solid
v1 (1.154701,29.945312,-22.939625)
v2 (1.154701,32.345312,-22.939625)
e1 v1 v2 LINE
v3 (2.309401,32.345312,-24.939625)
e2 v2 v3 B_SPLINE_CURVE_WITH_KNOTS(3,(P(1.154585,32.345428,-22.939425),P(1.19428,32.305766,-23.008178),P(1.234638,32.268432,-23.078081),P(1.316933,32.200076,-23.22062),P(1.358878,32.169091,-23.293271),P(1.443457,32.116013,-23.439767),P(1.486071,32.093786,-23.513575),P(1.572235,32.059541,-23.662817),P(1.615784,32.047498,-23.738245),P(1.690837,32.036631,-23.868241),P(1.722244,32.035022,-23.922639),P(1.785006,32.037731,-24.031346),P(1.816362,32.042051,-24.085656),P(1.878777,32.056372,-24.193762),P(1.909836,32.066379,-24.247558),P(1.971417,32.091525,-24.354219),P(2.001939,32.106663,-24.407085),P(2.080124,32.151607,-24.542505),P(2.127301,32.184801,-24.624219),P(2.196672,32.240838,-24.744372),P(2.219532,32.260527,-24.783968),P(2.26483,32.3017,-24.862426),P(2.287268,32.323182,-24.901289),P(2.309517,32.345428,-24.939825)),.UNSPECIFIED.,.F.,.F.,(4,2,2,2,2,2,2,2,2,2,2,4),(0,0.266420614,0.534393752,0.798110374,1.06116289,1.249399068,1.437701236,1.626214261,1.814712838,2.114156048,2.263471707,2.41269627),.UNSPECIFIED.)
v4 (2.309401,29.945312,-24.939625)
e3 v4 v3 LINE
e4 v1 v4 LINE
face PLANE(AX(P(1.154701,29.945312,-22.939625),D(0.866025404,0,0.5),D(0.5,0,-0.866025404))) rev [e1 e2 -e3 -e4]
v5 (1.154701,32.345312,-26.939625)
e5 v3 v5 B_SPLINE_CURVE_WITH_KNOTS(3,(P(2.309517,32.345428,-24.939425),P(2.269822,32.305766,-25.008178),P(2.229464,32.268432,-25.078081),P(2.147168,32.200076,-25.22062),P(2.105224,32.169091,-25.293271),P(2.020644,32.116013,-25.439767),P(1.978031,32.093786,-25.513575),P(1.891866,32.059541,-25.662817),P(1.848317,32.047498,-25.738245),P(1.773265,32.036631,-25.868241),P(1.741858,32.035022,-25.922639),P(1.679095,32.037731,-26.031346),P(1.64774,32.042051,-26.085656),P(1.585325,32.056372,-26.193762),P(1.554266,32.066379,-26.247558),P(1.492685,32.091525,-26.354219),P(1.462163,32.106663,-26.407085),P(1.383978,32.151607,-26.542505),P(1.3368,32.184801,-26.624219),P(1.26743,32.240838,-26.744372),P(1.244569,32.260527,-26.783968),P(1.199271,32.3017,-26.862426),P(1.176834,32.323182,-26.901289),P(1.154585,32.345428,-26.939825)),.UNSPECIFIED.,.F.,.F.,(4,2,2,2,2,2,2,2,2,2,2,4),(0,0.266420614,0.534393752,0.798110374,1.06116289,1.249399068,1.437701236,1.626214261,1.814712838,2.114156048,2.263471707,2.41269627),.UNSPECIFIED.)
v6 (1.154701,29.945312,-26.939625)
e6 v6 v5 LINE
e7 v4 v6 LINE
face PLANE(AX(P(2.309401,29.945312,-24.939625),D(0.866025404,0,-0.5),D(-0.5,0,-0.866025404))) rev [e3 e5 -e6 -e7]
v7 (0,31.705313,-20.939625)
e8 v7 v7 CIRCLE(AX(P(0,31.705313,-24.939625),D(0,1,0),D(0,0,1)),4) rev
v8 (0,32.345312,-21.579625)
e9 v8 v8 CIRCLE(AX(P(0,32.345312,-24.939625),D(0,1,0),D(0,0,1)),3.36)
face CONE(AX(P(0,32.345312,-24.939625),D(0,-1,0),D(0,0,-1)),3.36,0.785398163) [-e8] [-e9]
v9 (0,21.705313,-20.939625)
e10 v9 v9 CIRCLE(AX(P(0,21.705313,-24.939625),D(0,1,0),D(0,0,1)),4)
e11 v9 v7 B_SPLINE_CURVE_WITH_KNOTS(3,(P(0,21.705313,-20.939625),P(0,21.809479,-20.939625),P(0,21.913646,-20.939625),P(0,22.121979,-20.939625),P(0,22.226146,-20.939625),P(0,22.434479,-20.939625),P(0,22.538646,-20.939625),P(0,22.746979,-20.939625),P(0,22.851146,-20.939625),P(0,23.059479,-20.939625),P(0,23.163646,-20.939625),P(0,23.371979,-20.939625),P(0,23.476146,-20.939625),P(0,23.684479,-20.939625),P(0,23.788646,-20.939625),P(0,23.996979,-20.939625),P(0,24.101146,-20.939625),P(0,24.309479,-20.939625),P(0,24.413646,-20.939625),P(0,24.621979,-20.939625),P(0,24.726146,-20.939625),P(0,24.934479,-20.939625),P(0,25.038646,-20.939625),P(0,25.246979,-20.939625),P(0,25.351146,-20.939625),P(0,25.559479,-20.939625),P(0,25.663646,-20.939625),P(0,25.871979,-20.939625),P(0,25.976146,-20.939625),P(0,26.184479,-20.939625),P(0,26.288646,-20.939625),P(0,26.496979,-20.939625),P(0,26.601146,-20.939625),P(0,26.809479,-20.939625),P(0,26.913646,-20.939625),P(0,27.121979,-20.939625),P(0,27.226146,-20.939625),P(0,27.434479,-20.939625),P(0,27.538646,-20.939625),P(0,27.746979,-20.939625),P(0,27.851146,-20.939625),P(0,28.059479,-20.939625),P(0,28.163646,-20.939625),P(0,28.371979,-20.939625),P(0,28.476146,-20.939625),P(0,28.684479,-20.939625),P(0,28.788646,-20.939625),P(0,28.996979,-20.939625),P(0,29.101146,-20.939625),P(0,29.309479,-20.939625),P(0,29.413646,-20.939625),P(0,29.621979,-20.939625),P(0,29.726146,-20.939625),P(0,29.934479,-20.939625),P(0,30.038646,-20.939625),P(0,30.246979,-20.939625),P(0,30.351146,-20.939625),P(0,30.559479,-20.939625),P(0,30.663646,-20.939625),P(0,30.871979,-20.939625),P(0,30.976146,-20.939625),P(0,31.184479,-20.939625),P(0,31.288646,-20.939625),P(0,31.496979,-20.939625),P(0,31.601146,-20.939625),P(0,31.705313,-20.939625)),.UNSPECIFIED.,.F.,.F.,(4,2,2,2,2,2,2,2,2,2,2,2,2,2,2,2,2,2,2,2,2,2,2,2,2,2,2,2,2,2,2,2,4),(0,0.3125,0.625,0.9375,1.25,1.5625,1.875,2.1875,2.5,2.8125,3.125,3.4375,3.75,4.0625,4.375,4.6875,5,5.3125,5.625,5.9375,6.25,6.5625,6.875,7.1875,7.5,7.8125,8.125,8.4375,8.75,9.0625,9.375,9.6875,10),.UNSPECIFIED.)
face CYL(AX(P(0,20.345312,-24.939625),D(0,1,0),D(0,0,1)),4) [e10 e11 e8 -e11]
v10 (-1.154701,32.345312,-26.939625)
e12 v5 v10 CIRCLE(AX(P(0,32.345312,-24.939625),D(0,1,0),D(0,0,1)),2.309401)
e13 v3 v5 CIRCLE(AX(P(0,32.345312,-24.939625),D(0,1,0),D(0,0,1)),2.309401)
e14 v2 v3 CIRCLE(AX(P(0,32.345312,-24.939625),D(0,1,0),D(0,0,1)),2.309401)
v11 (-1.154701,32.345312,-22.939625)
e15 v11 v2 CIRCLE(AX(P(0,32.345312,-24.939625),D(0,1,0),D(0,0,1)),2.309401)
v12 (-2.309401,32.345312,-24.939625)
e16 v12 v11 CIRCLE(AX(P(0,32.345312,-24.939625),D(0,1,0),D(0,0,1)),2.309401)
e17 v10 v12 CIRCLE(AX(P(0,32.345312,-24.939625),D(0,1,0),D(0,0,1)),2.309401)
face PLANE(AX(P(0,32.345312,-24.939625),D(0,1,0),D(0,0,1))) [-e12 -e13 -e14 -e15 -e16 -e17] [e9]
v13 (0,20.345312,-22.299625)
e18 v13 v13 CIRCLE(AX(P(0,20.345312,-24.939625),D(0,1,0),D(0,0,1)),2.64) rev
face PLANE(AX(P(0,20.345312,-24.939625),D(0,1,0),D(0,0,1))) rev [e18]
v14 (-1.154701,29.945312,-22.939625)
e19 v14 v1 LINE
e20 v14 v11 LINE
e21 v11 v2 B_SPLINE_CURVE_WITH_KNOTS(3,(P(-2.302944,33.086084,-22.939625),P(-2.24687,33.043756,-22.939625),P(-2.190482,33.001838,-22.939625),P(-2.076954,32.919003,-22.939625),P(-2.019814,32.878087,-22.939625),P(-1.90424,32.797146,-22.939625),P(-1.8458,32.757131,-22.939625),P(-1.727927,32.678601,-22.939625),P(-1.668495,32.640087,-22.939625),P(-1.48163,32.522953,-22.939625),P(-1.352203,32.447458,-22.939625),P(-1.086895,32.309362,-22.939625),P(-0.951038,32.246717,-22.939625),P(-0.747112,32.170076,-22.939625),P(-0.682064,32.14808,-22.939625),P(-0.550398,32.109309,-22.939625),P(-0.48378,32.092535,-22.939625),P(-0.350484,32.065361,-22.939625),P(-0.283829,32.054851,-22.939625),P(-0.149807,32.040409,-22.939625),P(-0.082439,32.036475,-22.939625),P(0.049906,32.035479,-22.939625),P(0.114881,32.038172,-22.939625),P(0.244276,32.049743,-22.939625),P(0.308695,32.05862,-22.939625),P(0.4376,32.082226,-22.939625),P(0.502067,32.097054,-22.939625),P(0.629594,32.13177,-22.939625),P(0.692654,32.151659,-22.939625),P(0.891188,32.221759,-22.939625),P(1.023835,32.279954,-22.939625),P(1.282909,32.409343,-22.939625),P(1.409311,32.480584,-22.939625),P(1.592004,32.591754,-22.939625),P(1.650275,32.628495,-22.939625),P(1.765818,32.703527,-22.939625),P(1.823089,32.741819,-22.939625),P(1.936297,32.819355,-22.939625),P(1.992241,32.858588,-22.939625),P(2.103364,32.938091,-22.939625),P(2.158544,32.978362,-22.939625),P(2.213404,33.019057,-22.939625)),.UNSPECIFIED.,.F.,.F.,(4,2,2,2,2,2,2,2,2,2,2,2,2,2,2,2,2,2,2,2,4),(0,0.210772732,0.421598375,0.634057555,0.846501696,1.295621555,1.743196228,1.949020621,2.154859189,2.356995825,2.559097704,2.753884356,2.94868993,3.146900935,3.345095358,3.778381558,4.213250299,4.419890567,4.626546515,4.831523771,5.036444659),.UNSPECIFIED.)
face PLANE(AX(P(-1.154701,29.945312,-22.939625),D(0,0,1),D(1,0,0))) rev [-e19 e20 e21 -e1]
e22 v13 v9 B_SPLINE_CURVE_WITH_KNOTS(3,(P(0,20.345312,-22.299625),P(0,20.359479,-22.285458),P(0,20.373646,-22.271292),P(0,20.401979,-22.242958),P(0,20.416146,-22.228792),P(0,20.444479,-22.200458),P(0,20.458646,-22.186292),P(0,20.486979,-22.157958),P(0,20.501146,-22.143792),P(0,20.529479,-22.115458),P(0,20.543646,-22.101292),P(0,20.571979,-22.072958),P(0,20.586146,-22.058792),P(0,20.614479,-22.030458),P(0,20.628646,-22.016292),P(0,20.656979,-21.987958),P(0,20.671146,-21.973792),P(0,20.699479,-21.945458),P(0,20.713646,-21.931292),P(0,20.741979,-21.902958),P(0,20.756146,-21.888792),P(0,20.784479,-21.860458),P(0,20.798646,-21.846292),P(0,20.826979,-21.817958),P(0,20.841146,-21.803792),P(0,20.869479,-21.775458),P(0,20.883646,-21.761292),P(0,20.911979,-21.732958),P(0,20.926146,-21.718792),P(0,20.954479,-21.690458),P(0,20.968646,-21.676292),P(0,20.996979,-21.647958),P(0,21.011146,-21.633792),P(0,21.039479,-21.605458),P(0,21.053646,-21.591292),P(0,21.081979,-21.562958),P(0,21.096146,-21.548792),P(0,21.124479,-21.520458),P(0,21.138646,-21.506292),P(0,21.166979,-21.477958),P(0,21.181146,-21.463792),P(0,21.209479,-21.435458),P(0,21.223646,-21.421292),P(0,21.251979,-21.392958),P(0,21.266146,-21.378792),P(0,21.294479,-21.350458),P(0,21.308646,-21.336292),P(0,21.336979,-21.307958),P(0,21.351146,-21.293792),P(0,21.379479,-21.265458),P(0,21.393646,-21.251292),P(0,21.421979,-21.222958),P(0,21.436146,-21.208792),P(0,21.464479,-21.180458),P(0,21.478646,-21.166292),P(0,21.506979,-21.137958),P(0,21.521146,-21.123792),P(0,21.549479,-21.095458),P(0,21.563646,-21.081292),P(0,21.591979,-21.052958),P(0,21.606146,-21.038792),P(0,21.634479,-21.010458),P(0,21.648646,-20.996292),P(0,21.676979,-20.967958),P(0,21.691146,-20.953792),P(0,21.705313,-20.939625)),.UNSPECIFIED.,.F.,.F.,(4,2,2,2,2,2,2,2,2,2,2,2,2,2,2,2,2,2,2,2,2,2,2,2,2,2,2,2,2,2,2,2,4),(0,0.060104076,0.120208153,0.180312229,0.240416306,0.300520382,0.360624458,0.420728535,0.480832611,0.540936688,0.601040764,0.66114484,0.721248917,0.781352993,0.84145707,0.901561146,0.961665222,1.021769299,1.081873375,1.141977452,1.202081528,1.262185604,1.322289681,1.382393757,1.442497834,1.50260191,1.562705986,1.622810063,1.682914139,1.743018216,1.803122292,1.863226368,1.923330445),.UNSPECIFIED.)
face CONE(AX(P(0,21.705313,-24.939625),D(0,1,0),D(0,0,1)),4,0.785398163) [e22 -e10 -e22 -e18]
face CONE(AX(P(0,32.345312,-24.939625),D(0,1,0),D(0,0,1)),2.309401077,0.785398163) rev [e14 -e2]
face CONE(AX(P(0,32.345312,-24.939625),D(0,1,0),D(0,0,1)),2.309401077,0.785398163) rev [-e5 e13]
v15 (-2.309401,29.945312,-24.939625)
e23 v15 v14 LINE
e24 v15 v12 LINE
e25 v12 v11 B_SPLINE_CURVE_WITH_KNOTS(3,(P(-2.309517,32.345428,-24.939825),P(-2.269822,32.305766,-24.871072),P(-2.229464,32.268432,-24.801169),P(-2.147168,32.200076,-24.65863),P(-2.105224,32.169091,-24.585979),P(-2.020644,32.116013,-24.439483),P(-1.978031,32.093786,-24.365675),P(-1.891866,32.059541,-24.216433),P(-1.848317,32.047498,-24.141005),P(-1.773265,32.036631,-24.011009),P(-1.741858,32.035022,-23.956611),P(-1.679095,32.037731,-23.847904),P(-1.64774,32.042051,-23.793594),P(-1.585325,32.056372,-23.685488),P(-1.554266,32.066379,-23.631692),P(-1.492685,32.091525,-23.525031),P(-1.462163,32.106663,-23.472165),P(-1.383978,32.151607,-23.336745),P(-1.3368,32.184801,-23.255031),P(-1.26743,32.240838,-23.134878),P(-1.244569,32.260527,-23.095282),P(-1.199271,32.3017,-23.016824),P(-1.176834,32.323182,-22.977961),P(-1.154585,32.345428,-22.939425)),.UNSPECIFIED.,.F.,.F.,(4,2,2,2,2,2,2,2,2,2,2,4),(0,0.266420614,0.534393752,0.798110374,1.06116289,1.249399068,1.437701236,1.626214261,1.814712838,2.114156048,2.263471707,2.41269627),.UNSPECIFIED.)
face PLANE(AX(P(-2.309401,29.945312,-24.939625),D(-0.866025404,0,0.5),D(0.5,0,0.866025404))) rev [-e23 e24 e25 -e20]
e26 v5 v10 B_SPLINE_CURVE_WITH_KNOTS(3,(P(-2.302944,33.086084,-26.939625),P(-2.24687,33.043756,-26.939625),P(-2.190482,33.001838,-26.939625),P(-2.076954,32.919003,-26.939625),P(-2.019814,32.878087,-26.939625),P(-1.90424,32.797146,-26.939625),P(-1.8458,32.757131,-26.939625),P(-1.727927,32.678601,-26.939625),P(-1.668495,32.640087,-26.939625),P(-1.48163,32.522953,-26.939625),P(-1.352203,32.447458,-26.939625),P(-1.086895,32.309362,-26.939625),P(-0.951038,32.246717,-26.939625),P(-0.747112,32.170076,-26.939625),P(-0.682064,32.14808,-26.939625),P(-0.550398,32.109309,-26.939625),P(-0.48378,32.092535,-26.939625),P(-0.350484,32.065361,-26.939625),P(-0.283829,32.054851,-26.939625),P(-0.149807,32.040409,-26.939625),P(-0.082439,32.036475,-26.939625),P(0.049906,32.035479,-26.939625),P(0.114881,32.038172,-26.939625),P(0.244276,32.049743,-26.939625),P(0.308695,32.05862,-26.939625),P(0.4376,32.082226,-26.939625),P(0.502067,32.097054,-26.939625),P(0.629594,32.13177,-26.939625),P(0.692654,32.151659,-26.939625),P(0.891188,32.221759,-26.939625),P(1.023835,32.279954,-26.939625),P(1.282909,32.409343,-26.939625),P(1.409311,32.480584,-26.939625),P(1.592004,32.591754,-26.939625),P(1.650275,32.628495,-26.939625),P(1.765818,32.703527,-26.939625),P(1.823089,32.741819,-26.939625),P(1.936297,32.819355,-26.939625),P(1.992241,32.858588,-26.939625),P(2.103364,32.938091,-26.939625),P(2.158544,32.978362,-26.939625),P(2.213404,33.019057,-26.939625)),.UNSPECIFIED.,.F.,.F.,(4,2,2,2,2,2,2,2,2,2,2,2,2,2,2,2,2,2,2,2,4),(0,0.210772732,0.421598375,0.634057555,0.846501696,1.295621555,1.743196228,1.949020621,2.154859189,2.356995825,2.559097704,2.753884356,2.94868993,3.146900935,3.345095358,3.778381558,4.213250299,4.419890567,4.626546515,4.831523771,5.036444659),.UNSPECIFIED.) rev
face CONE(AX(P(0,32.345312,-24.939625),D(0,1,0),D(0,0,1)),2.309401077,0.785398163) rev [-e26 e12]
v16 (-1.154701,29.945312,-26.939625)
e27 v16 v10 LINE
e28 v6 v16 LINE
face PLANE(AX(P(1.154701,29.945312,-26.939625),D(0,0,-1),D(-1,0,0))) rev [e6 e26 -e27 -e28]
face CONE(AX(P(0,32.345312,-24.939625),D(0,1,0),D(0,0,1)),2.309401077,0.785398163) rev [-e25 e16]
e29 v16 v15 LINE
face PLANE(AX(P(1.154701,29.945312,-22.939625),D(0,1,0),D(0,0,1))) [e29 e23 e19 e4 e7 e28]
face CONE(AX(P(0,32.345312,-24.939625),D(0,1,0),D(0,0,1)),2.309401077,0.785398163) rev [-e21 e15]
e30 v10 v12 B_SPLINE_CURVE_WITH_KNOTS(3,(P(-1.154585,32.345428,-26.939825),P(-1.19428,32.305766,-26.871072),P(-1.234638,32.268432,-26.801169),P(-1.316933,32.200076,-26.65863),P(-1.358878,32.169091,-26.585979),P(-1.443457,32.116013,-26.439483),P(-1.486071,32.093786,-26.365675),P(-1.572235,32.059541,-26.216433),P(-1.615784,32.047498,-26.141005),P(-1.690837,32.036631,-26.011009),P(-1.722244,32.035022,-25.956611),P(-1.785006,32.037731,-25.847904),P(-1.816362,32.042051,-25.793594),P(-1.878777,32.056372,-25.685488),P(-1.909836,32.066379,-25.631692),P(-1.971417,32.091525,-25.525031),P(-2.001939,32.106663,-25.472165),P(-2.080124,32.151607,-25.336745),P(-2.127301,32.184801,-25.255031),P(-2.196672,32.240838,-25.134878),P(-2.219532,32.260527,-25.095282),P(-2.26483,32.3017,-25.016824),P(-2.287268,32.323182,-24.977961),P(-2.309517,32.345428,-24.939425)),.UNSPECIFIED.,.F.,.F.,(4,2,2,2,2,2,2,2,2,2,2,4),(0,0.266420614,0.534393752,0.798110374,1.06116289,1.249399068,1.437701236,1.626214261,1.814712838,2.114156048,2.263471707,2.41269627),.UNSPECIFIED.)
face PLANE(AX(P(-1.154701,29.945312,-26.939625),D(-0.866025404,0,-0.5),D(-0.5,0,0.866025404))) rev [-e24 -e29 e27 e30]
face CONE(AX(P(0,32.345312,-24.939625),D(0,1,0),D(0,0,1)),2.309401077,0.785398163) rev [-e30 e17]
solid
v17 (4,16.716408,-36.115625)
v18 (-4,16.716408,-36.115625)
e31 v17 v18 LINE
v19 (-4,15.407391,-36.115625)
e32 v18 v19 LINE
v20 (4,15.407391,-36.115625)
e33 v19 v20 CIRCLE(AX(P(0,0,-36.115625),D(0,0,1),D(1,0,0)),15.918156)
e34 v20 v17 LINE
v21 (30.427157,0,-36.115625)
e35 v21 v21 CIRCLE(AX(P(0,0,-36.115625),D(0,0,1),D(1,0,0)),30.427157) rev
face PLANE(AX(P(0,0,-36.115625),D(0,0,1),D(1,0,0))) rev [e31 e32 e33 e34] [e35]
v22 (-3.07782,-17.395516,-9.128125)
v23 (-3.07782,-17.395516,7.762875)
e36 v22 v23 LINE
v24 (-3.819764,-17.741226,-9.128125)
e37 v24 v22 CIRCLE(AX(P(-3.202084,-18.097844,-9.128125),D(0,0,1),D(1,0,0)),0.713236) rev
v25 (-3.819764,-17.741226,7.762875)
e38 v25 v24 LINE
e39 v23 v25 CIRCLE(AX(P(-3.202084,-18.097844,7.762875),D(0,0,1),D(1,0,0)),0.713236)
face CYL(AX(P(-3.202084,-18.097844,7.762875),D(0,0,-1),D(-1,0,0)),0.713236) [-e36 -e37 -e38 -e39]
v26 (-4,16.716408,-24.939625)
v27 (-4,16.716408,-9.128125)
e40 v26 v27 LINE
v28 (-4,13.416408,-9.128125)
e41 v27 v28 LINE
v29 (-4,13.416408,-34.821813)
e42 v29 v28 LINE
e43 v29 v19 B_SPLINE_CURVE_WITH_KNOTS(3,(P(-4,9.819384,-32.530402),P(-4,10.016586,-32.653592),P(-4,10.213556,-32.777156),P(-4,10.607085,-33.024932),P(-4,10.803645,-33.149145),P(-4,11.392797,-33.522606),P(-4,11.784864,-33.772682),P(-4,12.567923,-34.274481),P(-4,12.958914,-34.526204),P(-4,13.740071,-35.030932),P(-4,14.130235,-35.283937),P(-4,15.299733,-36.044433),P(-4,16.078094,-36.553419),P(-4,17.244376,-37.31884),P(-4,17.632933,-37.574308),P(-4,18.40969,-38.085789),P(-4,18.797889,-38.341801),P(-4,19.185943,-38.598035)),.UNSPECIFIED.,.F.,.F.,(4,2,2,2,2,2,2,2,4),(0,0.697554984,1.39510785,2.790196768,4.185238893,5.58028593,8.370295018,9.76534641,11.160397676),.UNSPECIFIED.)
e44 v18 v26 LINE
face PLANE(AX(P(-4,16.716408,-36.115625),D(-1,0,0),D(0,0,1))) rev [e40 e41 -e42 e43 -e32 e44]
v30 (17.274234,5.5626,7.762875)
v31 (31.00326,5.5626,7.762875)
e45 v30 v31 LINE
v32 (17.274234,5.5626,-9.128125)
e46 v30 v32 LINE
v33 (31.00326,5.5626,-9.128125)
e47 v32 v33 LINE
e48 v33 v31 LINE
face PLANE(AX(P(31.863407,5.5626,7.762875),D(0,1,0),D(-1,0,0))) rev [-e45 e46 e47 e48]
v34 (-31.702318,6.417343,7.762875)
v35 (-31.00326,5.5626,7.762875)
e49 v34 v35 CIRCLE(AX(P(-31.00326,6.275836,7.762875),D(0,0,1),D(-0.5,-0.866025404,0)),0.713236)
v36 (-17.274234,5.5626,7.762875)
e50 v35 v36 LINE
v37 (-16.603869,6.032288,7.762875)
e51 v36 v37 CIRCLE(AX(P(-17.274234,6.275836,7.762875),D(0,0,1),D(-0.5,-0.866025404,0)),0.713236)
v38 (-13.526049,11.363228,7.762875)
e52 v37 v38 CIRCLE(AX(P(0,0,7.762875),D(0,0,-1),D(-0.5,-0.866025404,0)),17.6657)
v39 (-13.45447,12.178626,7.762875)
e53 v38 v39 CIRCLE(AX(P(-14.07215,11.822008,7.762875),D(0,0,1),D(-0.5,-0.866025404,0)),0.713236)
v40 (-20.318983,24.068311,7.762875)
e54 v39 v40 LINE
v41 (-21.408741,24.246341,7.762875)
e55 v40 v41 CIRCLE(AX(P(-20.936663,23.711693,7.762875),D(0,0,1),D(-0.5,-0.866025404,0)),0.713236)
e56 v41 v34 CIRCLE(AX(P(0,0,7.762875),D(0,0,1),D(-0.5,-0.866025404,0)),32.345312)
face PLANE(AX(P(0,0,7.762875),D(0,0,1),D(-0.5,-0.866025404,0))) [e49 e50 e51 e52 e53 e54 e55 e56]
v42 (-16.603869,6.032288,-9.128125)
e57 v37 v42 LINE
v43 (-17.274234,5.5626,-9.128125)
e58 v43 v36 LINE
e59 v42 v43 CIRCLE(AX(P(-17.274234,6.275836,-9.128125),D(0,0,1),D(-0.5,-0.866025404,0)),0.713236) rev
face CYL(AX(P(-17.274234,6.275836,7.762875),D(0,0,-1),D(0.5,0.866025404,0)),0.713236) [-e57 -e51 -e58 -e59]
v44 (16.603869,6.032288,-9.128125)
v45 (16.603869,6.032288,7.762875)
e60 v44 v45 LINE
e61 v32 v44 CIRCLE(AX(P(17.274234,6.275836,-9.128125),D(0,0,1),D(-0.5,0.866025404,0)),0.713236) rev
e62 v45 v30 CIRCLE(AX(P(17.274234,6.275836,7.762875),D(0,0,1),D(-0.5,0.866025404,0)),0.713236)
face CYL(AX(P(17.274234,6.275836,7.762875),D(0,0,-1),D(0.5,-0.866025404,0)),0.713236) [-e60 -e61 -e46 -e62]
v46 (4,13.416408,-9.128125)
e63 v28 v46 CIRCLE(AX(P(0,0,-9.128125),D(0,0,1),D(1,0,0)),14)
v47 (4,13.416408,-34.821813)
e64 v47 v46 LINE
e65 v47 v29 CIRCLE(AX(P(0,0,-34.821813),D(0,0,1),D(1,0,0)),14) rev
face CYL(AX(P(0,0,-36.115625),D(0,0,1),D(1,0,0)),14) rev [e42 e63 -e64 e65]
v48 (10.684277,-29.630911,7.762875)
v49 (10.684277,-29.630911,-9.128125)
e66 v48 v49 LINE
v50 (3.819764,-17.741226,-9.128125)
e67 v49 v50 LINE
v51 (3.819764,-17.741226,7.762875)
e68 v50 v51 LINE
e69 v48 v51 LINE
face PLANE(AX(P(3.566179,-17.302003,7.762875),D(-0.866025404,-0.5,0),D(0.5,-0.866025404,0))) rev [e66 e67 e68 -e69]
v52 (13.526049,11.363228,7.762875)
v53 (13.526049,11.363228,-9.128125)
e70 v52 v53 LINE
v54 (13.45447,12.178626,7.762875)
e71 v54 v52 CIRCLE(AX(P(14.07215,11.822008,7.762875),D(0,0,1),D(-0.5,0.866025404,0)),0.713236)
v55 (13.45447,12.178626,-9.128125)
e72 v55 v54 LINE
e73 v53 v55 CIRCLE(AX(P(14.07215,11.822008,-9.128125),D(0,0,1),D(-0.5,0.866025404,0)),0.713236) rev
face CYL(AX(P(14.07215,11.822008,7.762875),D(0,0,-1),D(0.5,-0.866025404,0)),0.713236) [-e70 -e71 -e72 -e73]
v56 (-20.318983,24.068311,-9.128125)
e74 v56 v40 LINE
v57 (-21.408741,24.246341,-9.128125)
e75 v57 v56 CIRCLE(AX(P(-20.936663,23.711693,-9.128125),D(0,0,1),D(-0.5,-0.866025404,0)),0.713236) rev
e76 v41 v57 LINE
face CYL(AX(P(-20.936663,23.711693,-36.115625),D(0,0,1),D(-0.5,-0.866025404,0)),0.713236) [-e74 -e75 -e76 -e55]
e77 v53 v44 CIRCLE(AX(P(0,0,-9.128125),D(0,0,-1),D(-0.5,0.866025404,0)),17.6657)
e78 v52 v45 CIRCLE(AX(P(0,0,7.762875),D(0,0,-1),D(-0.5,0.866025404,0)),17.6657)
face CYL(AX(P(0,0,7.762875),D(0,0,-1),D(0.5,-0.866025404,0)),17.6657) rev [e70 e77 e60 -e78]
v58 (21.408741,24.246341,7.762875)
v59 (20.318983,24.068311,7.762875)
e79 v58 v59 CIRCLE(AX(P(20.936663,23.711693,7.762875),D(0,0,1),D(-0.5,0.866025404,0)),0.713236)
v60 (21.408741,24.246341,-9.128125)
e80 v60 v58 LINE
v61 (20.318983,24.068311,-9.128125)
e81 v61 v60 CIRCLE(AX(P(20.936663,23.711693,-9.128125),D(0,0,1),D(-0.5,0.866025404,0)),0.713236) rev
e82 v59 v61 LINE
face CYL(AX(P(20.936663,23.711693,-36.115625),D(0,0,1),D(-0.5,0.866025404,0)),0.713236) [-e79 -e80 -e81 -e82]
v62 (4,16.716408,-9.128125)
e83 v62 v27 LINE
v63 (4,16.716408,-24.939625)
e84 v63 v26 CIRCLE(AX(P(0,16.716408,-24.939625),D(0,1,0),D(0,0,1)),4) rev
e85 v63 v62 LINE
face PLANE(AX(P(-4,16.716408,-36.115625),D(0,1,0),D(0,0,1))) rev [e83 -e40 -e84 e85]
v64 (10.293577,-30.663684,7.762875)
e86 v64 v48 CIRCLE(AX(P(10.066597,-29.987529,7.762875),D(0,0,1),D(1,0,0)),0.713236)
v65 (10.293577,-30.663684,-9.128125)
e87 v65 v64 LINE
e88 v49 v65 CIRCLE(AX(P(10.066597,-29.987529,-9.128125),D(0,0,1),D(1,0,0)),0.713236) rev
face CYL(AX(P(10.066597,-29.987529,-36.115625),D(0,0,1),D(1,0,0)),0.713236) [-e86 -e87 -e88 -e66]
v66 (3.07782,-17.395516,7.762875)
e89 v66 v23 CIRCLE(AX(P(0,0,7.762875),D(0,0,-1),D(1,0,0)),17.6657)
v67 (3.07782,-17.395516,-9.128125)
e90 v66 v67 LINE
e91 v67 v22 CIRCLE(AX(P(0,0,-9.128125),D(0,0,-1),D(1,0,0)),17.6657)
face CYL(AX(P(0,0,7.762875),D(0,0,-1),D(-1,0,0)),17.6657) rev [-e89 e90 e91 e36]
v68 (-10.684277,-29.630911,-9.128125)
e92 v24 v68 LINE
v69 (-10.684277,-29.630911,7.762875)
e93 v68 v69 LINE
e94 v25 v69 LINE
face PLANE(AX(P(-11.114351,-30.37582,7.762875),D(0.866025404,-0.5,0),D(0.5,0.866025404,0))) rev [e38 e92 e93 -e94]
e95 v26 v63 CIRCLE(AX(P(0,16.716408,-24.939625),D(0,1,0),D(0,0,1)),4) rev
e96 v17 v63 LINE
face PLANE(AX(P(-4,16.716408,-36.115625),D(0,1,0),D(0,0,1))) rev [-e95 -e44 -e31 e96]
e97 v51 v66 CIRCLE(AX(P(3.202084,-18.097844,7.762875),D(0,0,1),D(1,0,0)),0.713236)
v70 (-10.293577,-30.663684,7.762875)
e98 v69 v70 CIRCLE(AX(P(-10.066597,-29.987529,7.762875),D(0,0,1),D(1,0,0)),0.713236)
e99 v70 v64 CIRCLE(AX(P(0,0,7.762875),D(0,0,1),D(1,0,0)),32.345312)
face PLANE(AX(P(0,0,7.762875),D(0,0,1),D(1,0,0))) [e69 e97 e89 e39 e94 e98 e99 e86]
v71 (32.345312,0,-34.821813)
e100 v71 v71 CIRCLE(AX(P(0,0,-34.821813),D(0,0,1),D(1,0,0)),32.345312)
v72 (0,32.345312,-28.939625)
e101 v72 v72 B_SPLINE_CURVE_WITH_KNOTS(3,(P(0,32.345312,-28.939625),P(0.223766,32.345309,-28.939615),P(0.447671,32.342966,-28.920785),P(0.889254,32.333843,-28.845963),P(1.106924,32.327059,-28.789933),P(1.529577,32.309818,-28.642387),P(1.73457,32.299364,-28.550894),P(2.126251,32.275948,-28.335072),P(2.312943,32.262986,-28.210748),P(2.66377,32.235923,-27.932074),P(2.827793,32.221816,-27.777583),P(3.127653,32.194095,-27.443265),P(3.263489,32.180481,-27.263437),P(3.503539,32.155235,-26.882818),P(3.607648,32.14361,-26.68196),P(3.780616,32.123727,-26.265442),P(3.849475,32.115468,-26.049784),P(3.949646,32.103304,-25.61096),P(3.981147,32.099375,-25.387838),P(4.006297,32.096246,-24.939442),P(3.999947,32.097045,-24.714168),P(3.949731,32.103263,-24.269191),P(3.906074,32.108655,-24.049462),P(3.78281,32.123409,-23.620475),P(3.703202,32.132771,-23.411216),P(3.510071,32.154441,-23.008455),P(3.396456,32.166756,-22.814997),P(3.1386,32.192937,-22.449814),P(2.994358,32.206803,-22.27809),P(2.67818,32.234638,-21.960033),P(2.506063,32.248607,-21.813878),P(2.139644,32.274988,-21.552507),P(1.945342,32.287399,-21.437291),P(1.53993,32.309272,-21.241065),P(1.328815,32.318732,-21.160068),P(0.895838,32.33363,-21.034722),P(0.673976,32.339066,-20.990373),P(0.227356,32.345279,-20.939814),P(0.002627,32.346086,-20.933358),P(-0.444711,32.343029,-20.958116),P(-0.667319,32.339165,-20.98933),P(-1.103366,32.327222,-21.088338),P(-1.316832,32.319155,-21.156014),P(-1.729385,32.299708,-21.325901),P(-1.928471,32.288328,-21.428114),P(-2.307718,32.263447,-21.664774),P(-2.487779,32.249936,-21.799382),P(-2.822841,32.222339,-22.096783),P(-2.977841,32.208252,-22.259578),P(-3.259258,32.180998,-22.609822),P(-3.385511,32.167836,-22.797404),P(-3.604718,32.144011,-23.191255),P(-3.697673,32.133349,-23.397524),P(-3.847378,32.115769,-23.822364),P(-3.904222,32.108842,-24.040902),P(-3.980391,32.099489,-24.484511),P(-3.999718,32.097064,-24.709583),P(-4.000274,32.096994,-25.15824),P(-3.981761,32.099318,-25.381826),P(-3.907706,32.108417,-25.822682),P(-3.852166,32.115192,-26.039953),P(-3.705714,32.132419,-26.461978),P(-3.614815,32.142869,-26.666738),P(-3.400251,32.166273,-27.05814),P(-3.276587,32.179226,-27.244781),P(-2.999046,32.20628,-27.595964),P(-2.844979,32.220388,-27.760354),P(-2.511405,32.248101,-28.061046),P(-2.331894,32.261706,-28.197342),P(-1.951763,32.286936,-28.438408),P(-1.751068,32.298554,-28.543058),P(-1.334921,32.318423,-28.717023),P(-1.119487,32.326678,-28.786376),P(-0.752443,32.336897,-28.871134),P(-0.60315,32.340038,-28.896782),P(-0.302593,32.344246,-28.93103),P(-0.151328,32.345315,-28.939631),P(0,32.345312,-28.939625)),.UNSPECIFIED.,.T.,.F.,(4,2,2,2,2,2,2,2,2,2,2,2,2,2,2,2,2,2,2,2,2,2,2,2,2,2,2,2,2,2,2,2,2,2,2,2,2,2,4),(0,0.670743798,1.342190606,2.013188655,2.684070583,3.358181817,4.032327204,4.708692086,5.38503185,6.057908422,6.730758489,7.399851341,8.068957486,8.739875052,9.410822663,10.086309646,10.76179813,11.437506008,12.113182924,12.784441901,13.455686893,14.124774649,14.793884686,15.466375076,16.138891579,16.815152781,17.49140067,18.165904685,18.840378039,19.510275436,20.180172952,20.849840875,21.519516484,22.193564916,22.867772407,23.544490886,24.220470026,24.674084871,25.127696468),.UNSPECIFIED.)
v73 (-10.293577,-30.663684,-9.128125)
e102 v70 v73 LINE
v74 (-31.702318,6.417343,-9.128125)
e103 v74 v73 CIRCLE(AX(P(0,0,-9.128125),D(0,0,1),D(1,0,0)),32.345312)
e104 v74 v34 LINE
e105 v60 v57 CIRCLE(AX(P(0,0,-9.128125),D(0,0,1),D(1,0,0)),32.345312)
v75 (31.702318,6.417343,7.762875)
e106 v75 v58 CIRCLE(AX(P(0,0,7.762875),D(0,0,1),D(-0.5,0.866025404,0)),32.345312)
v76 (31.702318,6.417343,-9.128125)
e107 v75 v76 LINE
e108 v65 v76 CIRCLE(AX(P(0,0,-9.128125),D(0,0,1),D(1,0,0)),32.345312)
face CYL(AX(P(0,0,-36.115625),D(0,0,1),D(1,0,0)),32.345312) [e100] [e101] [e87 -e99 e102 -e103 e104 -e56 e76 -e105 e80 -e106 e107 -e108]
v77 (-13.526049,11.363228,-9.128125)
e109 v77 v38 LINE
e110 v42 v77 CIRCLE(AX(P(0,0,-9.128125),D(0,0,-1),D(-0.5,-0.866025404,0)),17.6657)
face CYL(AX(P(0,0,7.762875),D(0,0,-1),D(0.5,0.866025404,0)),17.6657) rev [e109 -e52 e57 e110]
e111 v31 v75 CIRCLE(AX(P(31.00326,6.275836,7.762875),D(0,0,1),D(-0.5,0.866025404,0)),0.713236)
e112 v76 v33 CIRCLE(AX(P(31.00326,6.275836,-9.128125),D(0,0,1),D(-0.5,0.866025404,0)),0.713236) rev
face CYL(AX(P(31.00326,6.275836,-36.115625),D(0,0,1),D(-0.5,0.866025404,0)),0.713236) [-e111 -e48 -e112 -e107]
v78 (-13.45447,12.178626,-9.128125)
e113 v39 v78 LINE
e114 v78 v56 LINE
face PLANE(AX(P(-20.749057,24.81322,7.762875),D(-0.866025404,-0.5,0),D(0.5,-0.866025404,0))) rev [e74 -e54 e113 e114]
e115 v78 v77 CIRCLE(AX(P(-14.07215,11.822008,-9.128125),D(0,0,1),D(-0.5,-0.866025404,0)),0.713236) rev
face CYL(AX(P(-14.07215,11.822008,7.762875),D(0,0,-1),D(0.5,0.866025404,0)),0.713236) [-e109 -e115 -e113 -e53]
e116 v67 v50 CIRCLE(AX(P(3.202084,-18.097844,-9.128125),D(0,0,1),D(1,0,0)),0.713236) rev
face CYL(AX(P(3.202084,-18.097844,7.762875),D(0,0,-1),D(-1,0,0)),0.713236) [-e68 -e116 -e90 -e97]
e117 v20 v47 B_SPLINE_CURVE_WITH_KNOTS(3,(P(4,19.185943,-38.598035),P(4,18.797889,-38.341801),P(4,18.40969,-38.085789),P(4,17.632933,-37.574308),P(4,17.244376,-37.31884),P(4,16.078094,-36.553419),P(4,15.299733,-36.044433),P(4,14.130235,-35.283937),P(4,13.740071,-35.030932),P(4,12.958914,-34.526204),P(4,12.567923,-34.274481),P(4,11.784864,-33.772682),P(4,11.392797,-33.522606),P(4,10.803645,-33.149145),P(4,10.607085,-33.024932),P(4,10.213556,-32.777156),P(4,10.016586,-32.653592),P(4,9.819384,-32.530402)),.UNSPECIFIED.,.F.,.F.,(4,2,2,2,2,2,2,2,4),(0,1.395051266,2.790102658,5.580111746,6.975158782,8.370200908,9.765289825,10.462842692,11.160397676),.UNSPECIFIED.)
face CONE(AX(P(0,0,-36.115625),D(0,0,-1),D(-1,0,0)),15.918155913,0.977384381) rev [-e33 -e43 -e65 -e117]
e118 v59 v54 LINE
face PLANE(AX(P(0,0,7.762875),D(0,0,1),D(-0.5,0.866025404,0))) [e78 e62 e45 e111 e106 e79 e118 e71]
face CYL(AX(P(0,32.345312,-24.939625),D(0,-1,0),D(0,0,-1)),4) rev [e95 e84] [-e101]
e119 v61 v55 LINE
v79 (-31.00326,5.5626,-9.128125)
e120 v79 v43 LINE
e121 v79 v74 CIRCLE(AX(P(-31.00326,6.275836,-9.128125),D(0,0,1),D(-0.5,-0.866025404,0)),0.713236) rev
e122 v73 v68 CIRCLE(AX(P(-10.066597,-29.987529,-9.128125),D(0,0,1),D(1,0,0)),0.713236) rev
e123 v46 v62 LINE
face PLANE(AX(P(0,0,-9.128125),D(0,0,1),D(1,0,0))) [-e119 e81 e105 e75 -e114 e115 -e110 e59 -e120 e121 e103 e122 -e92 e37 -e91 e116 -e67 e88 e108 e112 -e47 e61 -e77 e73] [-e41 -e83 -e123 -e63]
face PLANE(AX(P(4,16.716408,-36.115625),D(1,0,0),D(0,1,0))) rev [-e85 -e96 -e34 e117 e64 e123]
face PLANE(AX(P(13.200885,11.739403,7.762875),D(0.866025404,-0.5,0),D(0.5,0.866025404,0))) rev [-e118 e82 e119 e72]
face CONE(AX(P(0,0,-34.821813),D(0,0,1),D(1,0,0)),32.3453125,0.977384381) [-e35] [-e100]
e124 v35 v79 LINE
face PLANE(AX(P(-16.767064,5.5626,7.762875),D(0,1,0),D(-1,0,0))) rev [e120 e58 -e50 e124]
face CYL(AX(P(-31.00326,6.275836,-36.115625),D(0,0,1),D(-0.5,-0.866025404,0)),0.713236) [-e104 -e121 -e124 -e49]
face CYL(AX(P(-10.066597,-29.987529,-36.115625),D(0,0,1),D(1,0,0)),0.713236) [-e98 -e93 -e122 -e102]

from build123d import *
from OCP.BRepFilletAPI import BRepFilletAPI_MakeChamfer

# Parameters (mm, degrees)
BOSS_EXTRUDE1_START      = -9.128125
SKETCH1_R                = 32.3453125
BOSS_EXTRUDE1_DEPTH      = 26.9875
BOSS_EXTRUDE2_DEPTH      = 16.891
FILLET1_R                = 0.713235825
CIRPATTERN1_COUNT        = 3
FILLET1_OF_CIRPATTERN1_R = 0.713235825
CUT_EXTRUDE5_DEPTH       = 59.281874117
CUT_EXTRUDE5_DEPTH_BACK  = 59.281874117
SKETCH15_R               = 14
CHAMFER1_SIZE            = 1.2938125
CHAMFER1_SIZE2           = 1.918155913
CUT_EXTRUDE1_DEPTH       = 59.281874117
CUT_EXTRUDE1_DEPTH_BACK  = 59.281874117
SKETCH5_R                = 4
CUT_EXTRUDE2_DEPTH       = 59.281874117
SKETCH6_R                = 4
BOSS_EXTRUDE3_DEPTH      = 12
CUT_EXTRUDE3_DEPTH       = 2.4
CHAMFER3_SIZE            = 0.64
CHAMFER4_SIZE            = 1.36


with BuildPart() as part:
    # Sketch1 → Boss-Extrude1 (new body)
    with BuildSketch(Plane.XY.offset(BOSS_EXTRUDE1_START)):
        Circle(SKETCH1_R)
    extrude(amount=-BOSS_EXTRUDE1_DEPTH)

    # Sketch2 → Boss-Extrude2 (add)
    with BuildSketch(Plane.XY.offset(-9.128125)):
        with BuildLine():
            Line((-11.114350717, -30.375820135), (-3.566179127, -17.302003437))
            ThreePointArc((-3.566179127, -17.302003437), (0, -17.6657), (3.566179127, -17.302003437))
            Line((3.566179127, -17.302003437), (11.114350717, -30.375820135))
            ThreePointArc((11.114350717, -30.375820135), (0, -32.3453125), (-11.114350717, -30.375820135))
        make_face()
    boss_extrude2 = extrude(amount=BOSS_EXTRUDE2_DEPTH)

    # Fillet1
    # the kernel refuses this fillet: 0.713235825 mm, written as the material it takes off along each edge
    with BuildSketch(Plane(origin=(-11.114350717, -30.375820135, -9.128125), x_dir=(0.9436455754007305, -0.3309577435664929, 0), z_dir=(0, 0, 1))) as fillet1_piece_1:
        with BuildLine():
            CenterArc((0.860200247, 0.713171354), FILLET1_R, 169.326916929, 101.443469756)
            Line((0.159303464, 0.845266176), (0, 0))
            ThreePointArc((0, 0), (0.434894987, -0.002923796), (0.869789973, 0))
        make_face()
    extrude(amount=19.065474933, mode=Mode.SUBTRACT)
    with BuildSketch(Plane(origin=(11.114350717, -30.375820135, -9.128125), x_dir=(-0.9436455754007282, -0.3309577435664989, 0), z_dir=(0, 0, 1))) as fillet1_piece_2:
        with BuildLine():
            CenterArc((0.860200247, -0.713171354), FILLET1_R, 89.229613314, 101.443469756)
            Line((0.159303464, -0.845266176), (0, 0))
            ThreePointArc((0, 0), (0.434894987, 0.002923796), (0.869789973, 0))
        make_face()
    extrude(amount=19.065474933, mode=Mode.SUBTRACT)
    with BuildSketch(Plane(origin=(3.566179127, -17.302003437, -9.128125), x_dir=(0.500000000000002, -0.8660254037844376, 0), z_dir=(0, 0, 1))) as fillet1_piece_3:
        with BuildLine():
            CenterArc((0.507170112, -0.713235825), FILLET1_R, 90, 70.033604576)
            ThreePointArc((-0.163195289, -0.469687941), (-0.07994504, -0.235418176), (0, 0))
            Line((0, 0), (0.507170112, 0))
        make_face()
    extrude(amount=18.158925279, mode=Mode.SUBTRACT)
    with BuildSketch(Plane(origin=(-3.566179127, -17.302003437, -9.128125), x_dir=(0.9821562739684868, -0.18806661985673784, 0), z_dir=(0, 0, 1))) as fillet1_piece_4:
        with BuildLine():
            CenterArc((0.507269431, -0.71316519), FILLET1_R, 90.806371221, 70.033604577)
            Line((-0.166457119, -0.479075724), (0, 0))
            ThreePointArc((0, 0), (0.248615901, -0.001749518), (0.497231801, 0))
        make_face()
    extrude(amount=18.158925279, mode=Mode.SUBTRACT)

    # CirPattern1: Boss-Extrude2 ×3 about axis
    cirpattern1_axis = Axis((0, 0, 0), (0, 0, 1))
    for i in range(1, CIRPATTERN1_COUNT):
        add(boss_extrude2.rotate(cirpattern1_axis, i * 360 / CIRPATTERN1_COUNT))

    # Fillet1 of CirPattern1
    # the kernel refuses this fillet: 0.713235825 mm, written as the material it takes off along each edge
    with BuildSketch(Plane(origin=(31.863407256, 5.5626, -9.128125), x_dir=(-0.18520497419260348, 0.9826999122490635, 0), z_dir=(0, 0, 1)), Plane(origin=(-20.749056539, 24.813220135, -9.128125), x_dir=(-0.7584406012081224, -0.6517421686825718, 0), z_dir=(0, 0, 1))) as fillet1_of_cirpattern1_piece_1:
        with BuildLine():
            CenterArc((0.860200247, 0.713171354), FILLET1_OF_CIRPATTERN1_R, 169.326916929, 101.443469756)
            Line((0.159303464, 0.845266176), (0, 0))
            ThreePointArc((0, 0), (0.434894987, -0.002923796), (0.869789973, 0))
        make_face()
    extrude(amount=19.065474933, mode=Mode.SUBTRACT)
    with BuildSketch(Plane(origin=(20.749056539, 24.813220135, -9.128125), x_dir=(0.7584406012081266, -0.6517421686825667, 0), z_dir=(0, 0, 1)), Plane(origin=(-31.863407256, 5.5626, -9.128125), x_dir=(0.18520497419260348, 0.9826999122490635, 0), z_dir=(0, 0, 1))) as fillet1_of_cirpattern1_piece_2:
        with BuildLine():
            CenterArc((0.860200247, -0.713171354), FILLET1_OF_CIRPATTERN1_R, 89.229613314, 101.443469756)
            Line((0.159303464, -0.845266176), (0, 0))
            ThreePointArc((0, 0), (0.434894987, 0.002923796), (0.869789973, 0))
        make_face()
    extrude(amount=19.065474933, mode=Mode.SUBTRACT)
    with BuildSketch(Plane(origin=(13.200884949, 11.739403437, -9.128125), x_dir=(0.49999999999999967, 0.8660254037844388, 0), z_dir=(0, 0, 1)), Plane(origin=(-16.767064076, 5.5626, -9.128125), x_dir=(-1, 0, 0), z_dir=(0, 0, 1))) as fillet1_of_cirpattern1_piece_3:
        with BuildLine():
            CenterArc((0.507170112, -0.713235825), FILLET1_OF_CIRPATTERN1_R, 90, 70.033604576)
            ThreePointArc((-0.163195289, -0.469687941), (-0.07994504, -0.235418176), (0, 0))
            Line((0, 0), (0.507170112, 0))
        make_face()
    extrude(amount=18.158925279, mode=Mode.SUBTRACT)
    with BuildSketch(Plane(origin=(16.767064076, 5.5626, -9.128125), x_dir=(-0.3282076665844337, 0.9446055936713488, 0), z_dir=(0, 0, 1)), Plane(origin=(-13.200884949, 11.739403437, -9.128125), x_dir=(-0.6539486073840537, -0.7565389738146059, 0), z_dir=(0, 0, 1))) as fillet1_of_cirpattern1_piece_4:
        with BuildLine():
            CenterArc((0.507269431, -0.71316519), FILLET1_OF_CIRPATTERN1_R, 90.806371221, 70.033604577)
            Line((-0.166457119, -0.479075724), (0, 0))
            ThreePointArc((0, 0), (0.248615901, -0.001749518), (0.497231801, 0))
        make_face()
    extrude(amount=18.158925279, mode=Mode.SUBTRACT)

    # Sketch15 → Cut-Extrude5 (cut, two sides: drawn at the far end of the back side and taken through both)
    with BuildSketch(Plane.XY.offset(-CUT_EXTRUDE5_DEPTH_BACK)):
        Circle(SKETCH15_R)
    extrude(amount=CUT_EXTRUDE5_DEPTH + CUT_EXTRUDE5_DEPTH_BACK, mode=Mode.SUBTRACT)

    # Chamfer1: one chamfer whose edges measure the first distance from different faces: ONE call of the kernel's chamfer builder (chamfer() names one face for all edges)
    chamfer1_edges_1 = [part.edges().sort_by_distance(p)[0] for p in [
        (-32.3453125, 0, -36.115625),
    ]]
    chamfer1_side_1 = [part.faces().sort_by_distance(p)[0] for p in [
        (-32.3453125, 0, -22.621875),
    ]]
    chamfer1_edges_2 = [part.edges().sort_by_distance(p)[0] for p in [
        (-14, 0, -36.115625),
    ]]
    chamfer1_side_2 = [part.faces().sort_by_distance(p)[0] for p in [
        (-14, 0, -22.621875),
    ]]
    chamfer1 = BRepFilletAPI_MakeChamfer(part.part.solid().wrapped)
    for e in chamfer1_edges_1:
        chamfer1.Add(CHAMFER1_SIZE, CHAMFER1_SIZE2, e.wrapped, chamfer1_side_1[0].wrapped)  # the first distance lies on this face
    for e in chamfer1_edges_2:
        chamfer1.Add(CHAMFER1_SIZE, CHAMFER1_SIZE2, e.wrapped, chamfer1_side_2[0].wrapped)  # the first distance lies on this face
    add(Compound.cast(chamfer1.Shape()), mode=Mode.REPLACE)

    # Sketch4 → Cut-Extrude1 (cut, two sides: drawn at the far end of the back side and taken through both)
    with BuildSketch(Plane.XY.offset(-CUT_EXTRUDE1_DEPTH_BACK)):
        with BuildLine():
            Line((-4, 16.716407865), (4, 16.716407865))
            Line((4, 16.716407865), (4, 13.416407865))
            ThreePointArc((4, 13.416407865), (0, 14), (-4, 13.416407865))
            Line((-4, 13.416407865), (-4, 16.716407865))
        make_face()
    extrude(amount=CUT_EXTRUDE1_DEPTH + CUT_EXTRUDE1_DEPTH_BACK, mode=Mode.SUBTRACT)

    # Sketch5 → Cut-Extrude2 (cut, through all)
    with BuildSketch(Plane(origin=(0, 0, 0), x_dir=(1, 0, 0), z_dir=(0, 1, 0))):
        with Locations(Location((0, 24.939625, 0), (0, 0, 90))):
            Circle(SKETCH5_R)
    extrude(amount=CUT_EXTRUDE2_DEPTH, mode=Mode.SUBTRACT)


with BuildPart() as body_2:
    # Sketch6 → Boss-Extrude3 (new body)
    with BuildSketch(Plane(origin=(0, 32.3453125, 0), x_dir=(-1, 0, 0), z_dir=(0, 1, 0))):
        with Locations(Location((0, -24.939625, 0), (0, 0, 90))):
            Circle(SKETCH6_R)
    extrude(amount=-BOSS_EXTRUDE3_DEPTH)

    # Sketch8 → Cut-Extrude3 (cut)
    with BuildSketch(Plane(origin=(0, 32.3453125, 0), x_dir=(1, 0, 0), z_dir=(0, 1, 0))):
        Polygon((1.154700538, 22.939625), (2.309401077, 24.939625), (1.154700538, 26.939625), (-1.154700538, 26.939625), (-2.309401077, 24.939625), (-1.154700538, 22.939625), align=None)
    extrude(amount=-CUT_EXTRUDE3_DEPTH, mode=Mode.SUBTRACT)

    # Cut-Extrude4 cone 1 section (through the dimple's axis) → Cut-Extrude4 (revolve, cut)
    with BuildSketch(Plane(origin=(0, 32.3453125, -24.939625), x_dir=(0, 0, 1), z_dir=(1, 0, 0))):
        Polygon((0, 0), (2.309401077, 0), (0, 2.309401077), align=None)
    revolve(axis=Axis((0, 32.3453125, -24.939625), (0, -1, 0)), mode=Mode.SUBTRACT)

    # Chamfer3
    chamfer3_edges = [body_2.edges().sort_by_distance(p)[0] for p in [
        (0, 32.3453125, -28.939625),
    ]]
    chamfer(chamfer3_edges, length=CHAMFER3_SIZE)

    # Chamfer4
    chamfer4_edges = [body_2.edges().sort_by_distance(p)[0] for p in [
        (0, 20.3453125, -28.939625),
    ]]
    chamfer(chamfer4_edges, length=CHAMFER4_SIZE)


solid = Compound([part.part, body_2.part])
